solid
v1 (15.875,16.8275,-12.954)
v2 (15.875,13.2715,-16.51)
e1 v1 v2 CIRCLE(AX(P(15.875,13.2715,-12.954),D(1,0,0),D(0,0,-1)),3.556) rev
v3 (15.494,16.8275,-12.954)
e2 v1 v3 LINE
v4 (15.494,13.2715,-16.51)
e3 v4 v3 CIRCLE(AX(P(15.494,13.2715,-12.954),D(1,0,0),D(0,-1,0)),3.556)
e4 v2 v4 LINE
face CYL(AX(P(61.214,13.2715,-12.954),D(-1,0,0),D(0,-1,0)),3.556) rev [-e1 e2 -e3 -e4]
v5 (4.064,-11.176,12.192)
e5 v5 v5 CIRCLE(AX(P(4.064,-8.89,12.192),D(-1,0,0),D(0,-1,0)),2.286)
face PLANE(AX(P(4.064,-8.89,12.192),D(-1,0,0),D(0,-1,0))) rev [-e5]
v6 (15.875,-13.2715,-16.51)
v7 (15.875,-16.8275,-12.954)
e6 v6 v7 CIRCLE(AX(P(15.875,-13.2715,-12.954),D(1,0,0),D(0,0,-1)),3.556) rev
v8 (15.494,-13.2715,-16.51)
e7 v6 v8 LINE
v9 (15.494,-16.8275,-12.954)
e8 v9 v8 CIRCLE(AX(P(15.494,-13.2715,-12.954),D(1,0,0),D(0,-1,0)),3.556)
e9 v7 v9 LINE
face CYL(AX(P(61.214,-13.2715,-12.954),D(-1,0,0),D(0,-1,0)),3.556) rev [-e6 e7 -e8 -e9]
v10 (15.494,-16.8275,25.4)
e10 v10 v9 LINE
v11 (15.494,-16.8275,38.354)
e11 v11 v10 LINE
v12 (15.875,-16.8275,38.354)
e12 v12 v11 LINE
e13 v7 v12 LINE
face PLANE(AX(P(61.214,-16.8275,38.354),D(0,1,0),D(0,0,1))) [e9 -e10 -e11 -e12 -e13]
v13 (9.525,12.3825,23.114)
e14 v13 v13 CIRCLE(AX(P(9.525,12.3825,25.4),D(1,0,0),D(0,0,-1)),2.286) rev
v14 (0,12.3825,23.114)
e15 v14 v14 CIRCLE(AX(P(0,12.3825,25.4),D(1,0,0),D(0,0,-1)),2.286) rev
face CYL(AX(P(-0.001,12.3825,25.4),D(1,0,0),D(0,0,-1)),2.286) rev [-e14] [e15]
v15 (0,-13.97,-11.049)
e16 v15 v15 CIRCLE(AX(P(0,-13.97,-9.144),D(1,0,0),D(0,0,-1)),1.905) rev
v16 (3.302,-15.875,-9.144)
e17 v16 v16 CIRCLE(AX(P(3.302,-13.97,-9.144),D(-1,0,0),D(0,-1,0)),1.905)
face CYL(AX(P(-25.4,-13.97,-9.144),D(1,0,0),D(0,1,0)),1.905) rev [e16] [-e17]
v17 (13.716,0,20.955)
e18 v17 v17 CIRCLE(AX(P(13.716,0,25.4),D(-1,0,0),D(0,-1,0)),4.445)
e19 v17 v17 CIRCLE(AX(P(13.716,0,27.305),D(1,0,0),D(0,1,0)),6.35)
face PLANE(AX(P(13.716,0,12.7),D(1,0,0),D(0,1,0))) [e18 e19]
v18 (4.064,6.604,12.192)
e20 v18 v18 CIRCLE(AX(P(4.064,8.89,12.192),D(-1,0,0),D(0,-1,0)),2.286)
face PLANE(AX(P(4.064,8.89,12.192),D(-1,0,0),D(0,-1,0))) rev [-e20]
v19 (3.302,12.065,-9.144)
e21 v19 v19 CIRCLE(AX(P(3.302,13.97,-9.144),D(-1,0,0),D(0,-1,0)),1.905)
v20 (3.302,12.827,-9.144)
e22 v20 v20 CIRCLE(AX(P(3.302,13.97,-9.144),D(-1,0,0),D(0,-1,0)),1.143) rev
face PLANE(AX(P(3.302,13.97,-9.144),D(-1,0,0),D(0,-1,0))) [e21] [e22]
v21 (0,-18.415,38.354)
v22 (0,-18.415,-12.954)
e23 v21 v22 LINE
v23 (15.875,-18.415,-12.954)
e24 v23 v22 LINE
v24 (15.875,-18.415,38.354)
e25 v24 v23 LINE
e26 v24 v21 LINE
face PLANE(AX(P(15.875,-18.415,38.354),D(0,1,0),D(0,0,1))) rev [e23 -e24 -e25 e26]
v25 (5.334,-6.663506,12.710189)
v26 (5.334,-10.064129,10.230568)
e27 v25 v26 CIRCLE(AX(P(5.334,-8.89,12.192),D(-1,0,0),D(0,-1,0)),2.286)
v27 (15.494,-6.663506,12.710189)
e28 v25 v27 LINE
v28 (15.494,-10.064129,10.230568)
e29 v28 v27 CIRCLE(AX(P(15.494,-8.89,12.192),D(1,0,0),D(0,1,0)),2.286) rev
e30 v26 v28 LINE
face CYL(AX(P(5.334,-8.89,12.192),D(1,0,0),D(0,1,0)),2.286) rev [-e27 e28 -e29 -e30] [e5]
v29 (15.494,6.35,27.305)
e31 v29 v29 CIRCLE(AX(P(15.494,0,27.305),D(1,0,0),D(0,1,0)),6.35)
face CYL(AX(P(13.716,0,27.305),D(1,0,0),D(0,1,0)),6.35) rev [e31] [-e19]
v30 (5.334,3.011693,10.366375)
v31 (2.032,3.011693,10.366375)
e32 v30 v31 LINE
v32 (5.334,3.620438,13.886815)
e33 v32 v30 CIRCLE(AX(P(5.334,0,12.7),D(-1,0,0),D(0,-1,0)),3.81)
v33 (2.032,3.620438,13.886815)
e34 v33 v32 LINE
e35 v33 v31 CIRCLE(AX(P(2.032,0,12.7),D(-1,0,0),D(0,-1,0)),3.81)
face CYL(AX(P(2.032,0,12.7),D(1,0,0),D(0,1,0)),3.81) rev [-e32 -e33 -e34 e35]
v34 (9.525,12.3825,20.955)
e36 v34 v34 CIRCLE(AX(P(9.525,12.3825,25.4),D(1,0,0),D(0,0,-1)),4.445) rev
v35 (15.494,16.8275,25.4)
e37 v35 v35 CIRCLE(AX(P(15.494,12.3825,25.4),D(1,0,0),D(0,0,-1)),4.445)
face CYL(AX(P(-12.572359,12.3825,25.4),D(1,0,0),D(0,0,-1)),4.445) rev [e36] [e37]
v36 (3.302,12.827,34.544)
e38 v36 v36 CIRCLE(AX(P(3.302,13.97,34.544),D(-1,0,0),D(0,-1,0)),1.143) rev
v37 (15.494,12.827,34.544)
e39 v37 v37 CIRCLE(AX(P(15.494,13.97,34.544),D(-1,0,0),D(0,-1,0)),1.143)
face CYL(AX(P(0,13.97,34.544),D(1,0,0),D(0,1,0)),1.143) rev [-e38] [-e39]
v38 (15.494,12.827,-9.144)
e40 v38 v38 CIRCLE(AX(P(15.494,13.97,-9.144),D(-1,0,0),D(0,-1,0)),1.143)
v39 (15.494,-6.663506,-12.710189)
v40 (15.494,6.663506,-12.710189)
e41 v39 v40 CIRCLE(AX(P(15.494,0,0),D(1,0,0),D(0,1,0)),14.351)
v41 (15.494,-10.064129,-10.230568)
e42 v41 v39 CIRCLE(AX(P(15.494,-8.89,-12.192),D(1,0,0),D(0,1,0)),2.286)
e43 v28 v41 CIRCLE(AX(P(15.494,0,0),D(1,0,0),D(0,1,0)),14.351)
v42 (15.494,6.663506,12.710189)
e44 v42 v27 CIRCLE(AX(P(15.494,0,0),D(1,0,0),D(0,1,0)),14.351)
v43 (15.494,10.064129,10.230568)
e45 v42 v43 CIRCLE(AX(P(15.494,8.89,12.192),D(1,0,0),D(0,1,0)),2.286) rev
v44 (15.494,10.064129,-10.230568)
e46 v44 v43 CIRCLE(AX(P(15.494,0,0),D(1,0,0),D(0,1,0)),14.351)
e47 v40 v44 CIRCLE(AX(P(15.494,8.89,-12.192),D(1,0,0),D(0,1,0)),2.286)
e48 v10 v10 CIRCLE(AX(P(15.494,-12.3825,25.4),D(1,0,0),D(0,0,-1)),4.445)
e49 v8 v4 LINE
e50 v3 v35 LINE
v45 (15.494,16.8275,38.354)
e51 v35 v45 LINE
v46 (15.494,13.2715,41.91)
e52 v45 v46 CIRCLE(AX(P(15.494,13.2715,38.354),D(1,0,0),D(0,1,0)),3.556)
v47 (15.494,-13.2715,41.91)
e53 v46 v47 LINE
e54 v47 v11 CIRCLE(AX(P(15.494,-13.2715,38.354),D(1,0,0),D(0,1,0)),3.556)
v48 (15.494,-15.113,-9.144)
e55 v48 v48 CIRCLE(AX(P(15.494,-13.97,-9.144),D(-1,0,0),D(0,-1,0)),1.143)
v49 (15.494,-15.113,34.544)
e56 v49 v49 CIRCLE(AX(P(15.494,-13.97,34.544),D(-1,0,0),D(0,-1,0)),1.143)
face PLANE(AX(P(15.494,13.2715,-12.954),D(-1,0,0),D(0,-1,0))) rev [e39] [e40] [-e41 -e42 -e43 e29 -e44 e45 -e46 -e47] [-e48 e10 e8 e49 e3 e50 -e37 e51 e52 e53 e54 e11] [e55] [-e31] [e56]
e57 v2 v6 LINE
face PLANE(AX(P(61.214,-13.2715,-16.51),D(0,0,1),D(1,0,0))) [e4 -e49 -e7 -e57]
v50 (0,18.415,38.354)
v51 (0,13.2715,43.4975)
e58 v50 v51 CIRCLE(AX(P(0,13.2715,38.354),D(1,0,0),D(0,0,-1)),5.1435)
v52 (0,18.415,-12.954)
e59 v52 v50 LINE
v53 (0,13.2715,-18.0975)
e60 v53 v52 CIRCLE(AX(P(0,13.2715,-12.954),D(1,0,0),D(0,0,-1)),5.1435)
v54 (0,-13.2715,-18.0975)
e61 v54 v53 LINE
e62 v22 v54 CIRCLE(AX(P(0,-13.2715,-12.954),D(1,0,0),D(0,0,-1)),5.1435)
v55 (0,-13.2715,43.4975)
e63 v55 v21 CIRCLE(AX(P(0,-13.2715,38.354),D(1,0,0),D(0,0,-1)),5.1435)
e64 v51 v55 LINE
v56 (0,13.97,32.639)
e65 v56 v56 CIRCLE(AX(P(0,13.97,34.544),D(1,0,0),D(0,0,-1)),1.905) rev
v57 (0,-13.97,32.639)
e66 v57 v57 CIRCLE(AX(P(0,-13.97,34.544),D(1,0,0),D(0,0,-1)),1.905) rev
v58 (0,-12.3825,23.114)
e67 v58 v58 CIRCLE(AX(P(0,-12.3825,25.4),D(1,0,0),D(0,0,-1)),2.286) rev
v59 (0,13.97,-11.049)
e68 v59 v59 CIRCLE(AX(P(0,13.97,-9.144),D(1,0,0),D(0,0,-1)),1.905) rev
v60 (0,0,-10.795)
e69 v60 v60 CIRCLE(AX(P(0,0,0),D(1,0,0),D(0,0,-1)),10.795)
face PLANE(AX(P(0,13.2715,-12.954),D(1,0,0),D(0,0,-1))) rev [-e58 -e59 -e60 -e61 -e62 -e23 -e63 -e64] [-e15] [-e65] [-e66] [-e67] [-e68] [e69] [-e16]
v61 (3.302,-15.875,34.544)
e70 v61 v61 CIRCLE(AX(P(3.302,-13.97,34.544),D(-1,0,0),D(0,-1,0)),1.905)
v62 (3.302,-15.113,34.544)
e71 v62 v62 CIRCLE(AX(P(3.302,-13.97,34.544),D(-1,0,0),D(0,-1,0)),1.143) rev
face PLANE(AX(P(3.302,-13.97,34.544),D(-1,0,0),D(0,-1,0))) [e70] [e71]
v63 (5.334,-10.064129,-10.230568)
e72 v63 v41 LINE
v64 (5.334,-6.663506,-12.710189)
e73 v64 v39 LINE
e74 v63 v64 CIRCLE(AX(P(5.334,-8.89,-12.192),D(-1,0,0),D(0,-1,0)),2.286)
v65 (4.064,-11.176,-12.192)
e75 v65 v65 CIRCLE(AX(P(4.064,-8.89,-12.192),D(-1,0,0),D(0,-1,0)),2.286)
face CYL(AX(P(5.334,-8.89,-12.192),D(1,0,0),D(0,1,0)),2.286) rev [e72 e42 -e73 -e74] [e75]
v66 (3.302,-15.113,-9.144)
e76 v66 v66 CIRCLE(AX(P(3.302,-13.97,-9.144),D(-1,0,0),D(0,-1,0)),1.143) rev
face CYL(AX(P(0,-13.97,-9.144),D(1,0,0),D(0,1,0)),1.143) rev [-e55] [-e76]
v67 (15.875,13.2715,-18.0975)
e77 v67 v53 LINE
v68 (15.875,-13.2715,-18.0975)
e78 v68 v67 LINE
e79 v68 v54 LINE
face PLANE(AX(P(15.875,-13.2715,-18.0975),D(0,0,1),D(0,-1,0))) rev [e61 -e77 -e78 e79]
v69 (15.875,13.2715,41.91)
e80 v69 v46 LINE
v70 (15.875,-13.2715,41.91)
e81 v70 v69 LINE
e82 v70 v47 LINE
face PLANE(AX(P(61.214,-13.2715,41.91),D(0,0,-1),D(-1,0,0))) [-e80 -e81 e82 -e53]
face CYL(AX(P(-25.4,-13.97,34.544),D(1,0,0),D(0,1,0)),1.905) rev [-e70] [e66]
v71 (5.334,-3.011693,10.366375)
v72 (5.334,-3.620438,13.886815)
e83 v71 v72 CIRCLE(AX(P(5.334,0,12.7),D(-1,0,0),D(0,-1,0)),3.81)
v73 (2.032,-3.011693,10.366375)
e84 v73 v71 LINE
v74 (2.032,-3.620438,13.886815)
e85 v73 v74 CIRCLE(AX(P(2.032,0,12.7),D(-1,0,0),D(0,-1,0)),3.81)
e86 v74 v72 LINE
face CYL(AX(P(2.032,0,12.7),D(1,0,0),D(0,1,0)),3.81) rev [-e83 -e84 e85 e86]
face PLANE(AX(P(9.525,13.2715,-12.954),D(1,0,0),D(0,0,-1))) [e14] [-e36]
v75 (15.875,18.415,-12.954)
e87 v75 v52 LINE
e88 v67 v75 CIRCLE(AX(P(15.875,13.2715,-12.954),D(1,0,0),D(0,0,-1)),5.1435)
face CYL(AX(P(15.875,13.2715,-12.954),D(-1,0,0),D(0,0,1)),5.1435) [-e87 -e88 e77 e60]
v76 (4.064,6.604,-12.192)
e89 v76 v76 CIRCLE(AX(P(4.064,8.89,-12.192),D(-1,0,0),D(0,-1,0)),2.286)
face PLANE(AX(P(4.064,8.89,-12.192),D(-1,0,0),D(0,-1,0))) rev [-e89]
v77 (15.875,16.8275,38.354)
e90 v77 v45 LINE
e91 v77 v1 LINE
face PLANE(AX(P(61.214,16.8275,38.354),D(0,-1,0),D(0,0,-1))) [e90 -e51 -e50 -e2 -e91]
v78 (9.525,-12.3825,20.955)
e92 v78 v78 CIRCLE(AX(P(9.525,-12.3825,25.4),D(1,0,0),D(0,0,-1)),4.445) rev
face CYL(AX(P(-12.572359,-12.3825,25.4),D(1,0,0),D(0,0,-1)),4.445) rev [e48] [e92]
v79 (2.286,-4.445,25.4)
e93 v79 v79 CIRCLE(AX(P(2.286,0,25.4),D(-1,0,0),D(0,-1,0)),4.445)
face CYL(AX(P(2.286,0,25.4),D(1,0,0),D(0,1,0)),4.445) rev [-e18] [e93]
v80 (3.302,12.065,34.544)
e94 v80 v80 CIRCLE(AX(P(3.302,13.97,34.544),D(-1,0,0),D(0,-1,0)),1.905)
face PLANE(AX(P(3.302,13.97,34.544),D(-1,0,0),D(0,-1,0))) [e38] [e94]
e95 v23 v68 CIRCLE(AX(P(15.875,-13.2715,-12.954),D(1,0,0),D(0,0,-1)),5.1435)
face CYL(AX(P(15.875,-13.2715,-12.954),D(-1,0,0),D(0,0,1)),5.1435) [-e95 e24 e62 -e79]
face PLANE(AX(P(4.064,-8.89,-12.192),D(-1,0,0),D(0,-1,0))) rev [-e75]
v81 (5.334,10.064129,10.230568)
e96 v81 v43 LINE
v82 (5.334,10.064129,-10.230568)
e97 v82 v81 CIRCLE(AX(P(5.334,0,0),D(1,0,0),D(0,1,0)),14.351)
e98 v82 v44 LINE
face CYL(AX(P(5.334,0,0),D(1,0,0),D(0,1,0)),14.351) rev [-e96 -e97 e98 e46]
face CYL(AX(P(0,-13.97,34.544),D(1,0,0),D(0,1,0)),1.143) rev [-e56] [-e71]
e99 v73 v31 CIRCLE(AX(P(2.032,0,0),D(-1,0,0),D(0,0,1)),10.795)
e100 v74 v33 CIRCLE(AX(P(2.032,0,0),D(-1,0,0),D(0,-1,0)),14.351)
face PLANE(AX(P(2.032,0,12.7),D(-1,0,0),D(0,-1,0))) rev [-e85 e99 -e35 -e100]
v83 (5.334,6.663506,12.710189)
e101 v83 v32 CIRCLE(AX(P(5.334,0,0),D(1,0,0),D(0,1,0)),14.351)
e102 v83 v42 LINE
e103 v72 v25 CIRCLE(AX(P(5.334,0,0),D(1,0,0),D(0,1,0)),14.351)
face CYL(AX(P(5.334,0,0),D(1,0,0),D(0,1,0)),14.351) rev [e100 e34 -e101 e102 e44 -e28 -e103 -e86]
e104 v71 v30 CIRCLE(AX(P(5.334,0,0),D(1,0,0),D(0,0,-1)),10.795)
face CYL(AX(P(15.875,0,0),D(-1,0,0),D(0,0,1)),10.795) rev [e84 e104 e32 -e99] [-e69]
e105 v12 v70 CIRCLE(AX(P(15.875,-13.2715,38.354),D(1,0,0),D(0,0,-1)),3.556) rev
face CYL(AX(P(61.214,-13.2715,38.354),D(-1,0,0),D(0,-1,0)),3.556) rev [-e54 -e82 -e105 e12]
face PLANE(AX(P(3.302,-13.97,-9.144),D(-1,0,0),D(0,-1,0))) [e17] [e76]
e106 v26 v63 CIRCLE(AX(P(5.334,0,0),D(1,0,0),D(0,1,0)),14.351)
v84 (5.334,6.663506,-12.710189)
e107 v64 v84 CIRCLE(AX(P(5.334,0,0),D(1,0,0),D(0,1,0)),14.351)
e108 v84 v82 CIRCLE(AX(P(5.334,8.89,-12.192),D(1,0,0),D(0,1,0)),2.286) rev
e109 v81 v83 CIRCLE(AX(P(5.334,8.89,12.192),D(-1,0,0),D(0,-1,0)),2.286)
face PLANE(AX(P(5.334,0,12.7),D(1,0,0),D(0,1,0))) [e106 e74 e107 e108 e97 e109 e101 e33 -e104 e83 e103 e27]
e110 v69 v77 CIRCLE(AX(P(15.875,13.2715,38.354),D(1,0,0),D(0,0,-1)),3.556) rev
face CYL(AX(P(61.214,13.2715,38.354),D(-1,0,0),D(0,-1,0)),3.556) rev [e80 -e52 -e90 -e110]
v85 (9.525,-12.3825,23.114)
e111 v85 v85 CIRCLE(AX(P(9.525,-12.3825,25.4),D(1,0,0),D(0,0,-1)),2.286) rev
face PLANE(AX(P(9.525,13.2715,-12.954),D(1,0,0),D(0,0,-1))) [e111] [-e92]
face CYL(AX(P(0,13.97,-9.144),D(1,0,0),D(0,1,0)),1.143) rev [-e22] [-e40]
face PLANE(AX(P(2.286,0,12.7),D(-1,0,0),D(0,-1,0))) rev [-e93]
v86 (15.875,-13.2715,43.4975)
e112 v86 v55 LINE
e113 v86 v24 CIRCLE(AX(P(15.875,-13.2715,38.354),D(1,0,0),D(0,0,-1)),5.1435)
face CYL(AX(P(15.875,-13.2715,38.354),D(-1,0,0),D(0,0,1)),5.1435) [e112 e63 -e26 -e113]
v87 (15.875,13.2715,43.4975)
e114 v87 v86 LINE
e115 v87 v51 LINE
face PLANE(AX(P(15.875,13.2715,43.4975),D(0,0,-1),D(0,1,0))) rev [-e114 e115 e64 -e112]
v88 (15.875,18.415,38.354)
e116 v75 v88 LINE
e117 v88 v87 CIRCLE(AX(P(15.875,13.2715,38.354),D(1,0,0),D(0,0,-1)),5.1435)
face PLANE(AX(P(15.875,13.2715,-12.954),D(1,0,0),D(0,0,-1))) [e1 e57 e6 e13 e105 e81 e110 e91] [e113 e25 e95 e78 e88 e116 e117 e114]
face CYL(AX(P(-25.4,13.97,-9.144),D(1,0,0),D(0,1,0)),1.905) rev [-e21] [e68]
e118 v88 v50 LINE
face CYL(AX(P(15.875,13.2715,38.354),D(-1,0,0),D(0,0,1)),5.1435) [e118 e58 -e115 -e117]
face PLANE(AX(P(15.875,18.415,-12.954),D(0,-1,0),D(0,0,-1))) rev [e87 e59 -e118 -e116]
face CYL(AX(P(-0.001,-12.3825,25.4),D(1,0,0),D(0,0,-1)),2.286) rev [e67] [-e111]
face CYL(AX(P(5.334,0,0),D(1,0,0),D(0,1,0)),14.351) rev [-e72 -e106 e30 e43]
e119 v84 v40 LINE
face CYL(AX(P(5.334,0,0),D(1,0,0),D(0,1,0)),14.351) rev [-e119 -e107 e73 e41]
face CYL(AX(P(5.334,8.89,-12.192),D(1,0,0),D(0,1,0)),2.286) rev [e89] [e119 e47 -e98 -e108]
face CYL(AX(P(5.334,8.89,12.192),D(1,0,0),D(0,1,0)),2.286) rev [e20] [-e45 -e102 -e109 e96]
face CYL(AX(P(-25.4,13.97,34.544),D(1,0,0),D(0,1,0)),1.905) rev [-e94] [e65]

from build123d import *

# Parameters (mm, degrees)
SKETCH1_R             = 10.795
BOSS_EXTRUDE1_DEPTH   = 15.875
CAVITY1_START         = 5.334
CAVITY1_OUTLINE_R     = 1.143
CAVITY1_OUTLINE_R_2   = 4.445
CAVITY1_OUTLINE_R_3   = 10.795
CAVITY1_DEPTH         = 10.541
CAVITY1_START_2       = 15.494
CAVITY1_2_OUTLINE_R   = 1.143
CAVITY1_2_OUTLINE_R_2 = 4.445
CAVITY1_2_DEPTH       = 0.381
CAVITY1_START_3       = 2.286
CAVITY1_3_OUTLINE_R   = 1.143
CAVITY1_3_OUTLINE_R_2 = 4.445
CAVITY1_3_DEPTH       = 3.048
CAVITY1_4_OUTLINE_R   = 1.905
CAVITY1_4_DEPTH       = 3.302
CAVITY1_START_4       = 13.716
CAVITY1_5_DEPTH       = 1.778
CAVITY1_START_5       = 4.064
CAVITY1_6_OUTLINE_R   = 2.286
CAVITY1_6_DEPTH       = 1.27
CAVITY1_START_6       = 2.032
CAVITY1_7_DEPTH       = 0.254
CUT_EXTRUDE1_REACH    = 51.711
SKETCH2_R             = 2.286
SKETCH3_R             = 4.445
CUT_EXTRUDE2_DEPTH    = 5.969


# Read off the part's stored shape, not the designer's step: Cavity1
with BuildPart() as part:
    # Sketch1 → Boss-Extrude1 (new body)
    with BuildSketch(Plane(origin=(0, 0, 0), x_dir=(0, 0, -1), z_dir=(1, 0, 0))):
        with BuildLine():
            Line((12.954, 18.415), (-38.354, 18.415))
            ThreePointArc((-38.354, 18.415), (-41.991003729, 16.908503729), (-43.4975, 13.2715))
            Line((-43.4975, 13.2715), (-43.4975, -13.2715))
            ThreePointArc((-43.4975, -13.2715), (-41.991003729, -16.908503729), (-38.354, -18.415))
            Line((-38.354, -18.415), (12.954, -18.415))
            ThreePointArc((12.954, -18.415), (16.591003729, -16.908503729), (18.0975, -13.2715))
            Line((18.0975, -13.2715), (18.0975, 13.2715))
            ThreePointArc((18.0975, 13.2715), (16.591003729, 16.908503729), (12.954, 18.415))
        make_face()
        Circle(SKETCH1_R, mode=Mode.SUBTRACT)
    extrude(amount=BOSS_EXTRUDE1_DEPTH)

    # Cavity1 outline → Cavity1 (cut)
    # profile 1 of 6: a face of its own
    with BuildSketch(Plane.YZ.offset(CAVITY1_START)):
        with Locations((13.97, 34.544)):
            Circle(CAVITY1_OUTLINE_R)
    # profile 2 of 6: a face of its own
    with BuildSketch(Plane.YZ.offset(CAVITY1_START)):
        with Locations((0, 25.4)):
            Circle(CAVITY1_OUTLINE_R_2)
    # profile 3 of 6: a face of its own
    with BuildSketch(Plane.YZ.offset(CAVITY1_START)):
        with BuildLine():
            ThreePointArc((6.663505747, 12.710188518), (0, 14.351), (-6.663505747, 12.710188518))
            ThreePointArc((-6.663505747, 12.710188518), (-10.236847552, 14.039105214), (-10.064128852, 10.230567504))
            ThreePointArc((-10.064128852, 10.230567504), (-14.351, 0), (-10.064128852, -10.230567504))
            ThreePointArc((-10.064128852, -10.230567504), (-10.236847552, -14.039105214), (-6.663505747, -12.710188518))
            ThreePointArc((-6.663505747, -12.710188518), (0, -14.351), (6.663505747, -12.710188518))
            ThreePointArc((6.663505747, -12.710188518), (10.236847552, -14.039105214), (10.064128852, -10.230567504))
            ThreePointArc((10.064128852, -10.230567504), (14.351, 0), (10.064128852, 10.230567504))
            ThreePointArc((10.064128852, 10.230567504), (10.236847552, 14.039105214), (6.663505747, 12.710188518))
        make_face()
        Circle(CAVITY1_OUTLINE_R_3, mode=Mode.SUBTRACT)
    # profile 4 of 6: a face of its own
    with BuildSketch(Plane.YZ.offset(CAVITY1_START)):
        with Locations((13.97, -9.144)):
            Circle(CAVITY1_OUTLINE_R)
    # profile 5 of 6: a face of its own
    with BuildSketch(Plane.YZ.offset(CAVITY1_START)):
        with Locations((-13.97, 34.544)):
            Circle(CAVITY1_OUTLINE_R)
    # profile 6 of 6: a face of its own
    with BuildSketch(Plane.YZ.offset(CAVITY1_START)):
        with Locations((-13.97, -9.144)):
            Circle(CAVITY1_OUTLINE_R)
    extrude(amount=CAVITY1_DEPTH, mode=Mode.SUBTRACT)

    # Cavity1 2 outline → Cavity1 2 (cut)
    with BuildSketch(Plane.YZ.offset(CAVITY1_START_2)):
        with BuildLine():
            ThreePointArc((16.8275, 38.354), (15.785971714, 40.868471714), (13.2715, 41.91))
            Line((13.2715, 41.91), (-13.2715, 41.91))
            ThreePointArc((-13.2715, 41.91), (-15.785971714, 40.868471714), (-16.8275, 38.354))
            Line((-16.8275, 38.354), (-16.8275, -12.954))
            ThreePointArc((-16.8275, -12.954), (-15.785971714, -15.468471714), (-13.2715, -16.51))
            Line((-13.2715, -16.51), (13.2715, -16.51))
            ThreePointArc((13.2715, -16.51), (15.785971714, -15.468471714), (16.8275, -12.954))
            Line((16.8275, -12.954), (16.8275, 38.354))
        make_face()
        with Locations((13.97, 34.544)):
            Circle(CAVITY1_2_OUTLINE_R, mode=Mode.SUBTRACT)
        with BuildLine():
            ThreePointArc((10.064128852, 10.230567504), (14.351, 0), (10.064128852, -10.230567504))
            ThreePointArc((10.064128852, -10.230567504), (10.236847552, -14.039105214), (6.663505747, -12.710188518))
            ThreePointArc((6.663505747, -12.710188518), (0, -14.351), (-6.663505747, -12.710188518))
            ThreePointArc((-6.663505747, -12.710188518), (-10.236847552, -14.039105214), (-10.064128852, -10.230567504))
            ThreePointArc((-10.064128852, -10.230567504), (-14.351, 0), (-10.064128852, 10.230567504))
            ThreePointArc((-10.064128852, 10.230567504), (-10.236847552, 14.039105214), (-6.663505747, 12.710188518))
            ThreePointArc((-6.663505747, 12.710188518), (0, 14.351), (6.663505747, 12.710188518))
            ThreePointArc((6.663505747, 12.710188518), (10.236847552, 14.039105214), (10.064128852, 10.230567504))
        make_face(mode=Mode.SUBTRACT)
        with Locations((0, 25.4)):
            Circle(CAVITY1_2_OUTLINE_R_2, mode=Mode.SUBTRACT)
        with Locations((13.97, -9.144)):
            Circle(CAVITY1_2_OUTLINE_R, mode=Mode.SUBTRACT)
        with Locations((-13.97, 34.544)):
            Circle(CAVITY1_2_OUTLINE_R, mode=Mode.SUBTRACT)
        with Locations((-13.97, -9.144)):
            Circle(CAVITY1_2_OUTLINE_R, mode=Mode.SUBTRACT)
    extrude(amount=CAVITY1_2_DEPTH, mode=Mode.SUBTRACT)

    # Cavity1 3 outline → Cavity1 3 (cut)
    with BuildSketch(Plane.YZ.offset(CAVITY1_START_3)):
        with Locations((13.97, 34.544)):
            Circle(CAVITY1_3_OUTLINE_R)
        with Locations((0, 25.4)):
            Circle(CAVITY1_3_OUTLINE_R_2)
        with BuildLine():
            ThreePointArc((3.011692939, 10.366375), (3.7542861, 12.050819068), (3.62043784, 13.886815))
            ThreePointArc((3.62043784, 13.886815), (0, 14.351), (-3.62043784, 13.886815))
            ThreePointArc((-3.62043784, 13.886815), (-3.7542861, 12.050819068), (-3.011692939, 10.366375))
            ThreePointArc((-3.011692939, 10.366375), (0, 10.795), (3.011692939, 10.366375))
        make_face()
        with Locations((13.97, -9.144)):
            Circle(CAVITY1_3_OUTLINE_R)
        with Locations((-13.97, 34.544)):
            Circle(CAVITY1_3_OUTLINE_R)
        with Locations((-13.97, -9.144)):
            Circle(CAVITY1_3_OUTLINE_R)
    extrude(amount=CAVITY1_3_DEPTH, mode=Mode.SUBTRACT)

    # Cavity1 4 outline → Cavity1 4 (cut)
    with BuildSketch(Plane.YZ):
        with Locations((13.97, 34.544)):
            Circle(CAVITY1_4_OUTLINE_R)
        with Locations((13.97, -9.144)):
            Circle(CAVITY1_4_OUTLINE_R)
        with Locations((-13.97, 34.544)):
            Circle(CAVITY1_4_OUTLINE_R)
        with Locations((-13.97, -9.144)):
            Circle(CAVITY1_4_OUTLINE_R)
    extrude(amount=CAVITY1_4_DEPTH, mode=Mode.SUBTRACT)

    # Cavity1 5 outline → Cavity1 5 (cut)
    with BuildSketch(Plane.YZ.offset(CAVITY1_START_4)):
        with BuildLine():
            Line((4.32851275, 24.389058668), (6.269761763, 26.298725967))
            ThreePointArc((6.269761763, 26.298725967), (6.329908656, 26.800266009), (6.35, 27.305))
            ThreePointArc((6.35, 27.305), (5.350674614, 30.724470892), (2.667234274, 33.067669635))
            Line((2.667234274, 33.067669635), (1.522653349, 29.576068938))
            ThreePointArc((1.522653349, 29.576068938), (3.641855237, 27.948512396), (4.445, 25.4))
            ThreePointArc((4.445, 25.4), (4.41578216, 24.891184794), (4.32851275, 24.389058668))
        make_face()
        with BuildLine():
            ThreePointArc((1.261900966, 21.081648335), (4.581043617, 22.907666788), (6.269761763, 26.298725967))
            Line((6.269761763, 26.298725967), (4.32851275, 24.389058668))
            ThreePointArc((4.32851275, 24.389058668), (3.227510813, 22.343662494), (1.245086431, 21.132941906))
            Line((1.245086431, 21.132941906), (1.261900966, 21.081648335))
        make_face()
        with BuildLine():
            ThreePointArc((0.903307826, 21.019577582), (1.083049155, 21.048043509), (1.261900966, 21.081648335))
            Line((1.261900966, 21.081648335), (1.245086431, 21.132941906))
            ThreePointArc((1.245086431, 21.132941906), (1.093135949, 21.091510845), (0.939813075, 21.055488936))
            Line((0.939813075, 21.055488936), (0.903307826, 21.019577582))
        make_face()
        with BuildLine():
            ThreePointArc((3.3e-08, 20.955), (0.452806623, 20.971164972), (0.903307826, 21.019577582))
            Line((0.903307826, 21.019577582), (0.939813075, 21.055488936))
            ThreePointArc((0.939813075, 21.055488936), (0.472585099, 20.980193633), (3.3e-08, 20.955))
        make_face()
        with BuildLine():
            Line((1.522653349, 29.576068938), (2.667234274, 33.067669635))
            ThreePointArc((2.667234274, 33.067669635), (0, 33.655), (-2.667234274, 33.067669635))
            Line((-2.667234274, 33.067669635), (-1.522653349, 29.576068938))
            ThreePointArc((-1.522653349, 29.576068938), (0, 29.845), (1.522653349, 29.576068938))
        make_face()
        with BuildLine():
            ThreePointArc((-0.903307826, 21.019577582), (-0.45280659, 20.97116497), (3.3e-08, 20.955))
            ThreePointArc((3.3e-08, 20.955), (-0.472585066, 20.980193629), (-0.939813075, 21.055488936))
            Line((-0.939813075, 21.055488936), (-0.903307826, 21.019577582))
        make_face()
        with BuildLine():
            Line((-1.522653349, 29.576068938), (-2.667234274, 33.067669635))
            ThreePointArc((-2.667234274, 33.067669635), (-5.605544054, 30.288349771), (-6.269761763, 26.298725967))
            Line((-6.269761763, 26.298725967), (-4.32851275, 24.389058668))
            ThreePointArc((-4.32851275, 24.389058668), (-3.909642575, 27.514880596), (-1.522653349, 29.576068938))
        make_face()
        with BuildLine():
            ThreePointArc((-1.261900966, 21.081648335), (-1.083049155, 21.048043509), (-0.903307826, 21.019577582))
            Line((-0.903307826, 21.019577582), (-0.939813075, 21.055488936))
            ThreePointArc((-0.939813075, 21.055488936), (-1.093135949, 21.091510845), (-1.245086431, 21.132941906))
            Line((-1.245086431, 21.132941906), (-1.261900966, 21.081648335))
        make_face()
        with BuildLine():
            Line((-4.32851275, 24.389058668), (-6.269761763, 26.298725967))
            ThreePointArc((-6.269761763, 26.298725967), (-4.581043617, 22.907666788), (-1.261900966, 21.081648335))
            Line((-1.261900966, 21.081648335), (-1.245086431, 21.132941906))
            ThreePointArc((-1.245086431, 21.132941906), (-3.227510813, 22.343662494), (-4.32851275, 24.389058668))
        make_face()
    extrude(amount=CAVITY1_5_DEPTH, mode=Mode.SUBTRACT)

    # Cavity1 6 outline → Cavity1 6 (cut)
    with BuildSketch(Plane.YZ.offset(CAVITY1_START_5)):
        with Locations((8.89, 12.192)):
            Circle(CAVITY1_6_OUTLINE_R)
        with Locations((8.89, -12.192)):
            Circle(CAVITY1_6_OUTLINE_R)
        with Locations((-8.89, 12.192)):
            Circle(CAVITY1_6_OUTLINE_R)
        with Locations((-8.89, -12.192)):
            Circle(CAVITY1_6_OUTLINE_R)
    extrude(amount=CAVITY1_6_DEPTH, mode=Mode.SUBTRACT)

    # Cavity1 7 outline → Cavity1 7 (cut)
    with BuildSketch(Plane.YZ.offset(CAVITY1_START_6)):
        with BuildLine():
            ThreePointArc((3.011692939, 10.366375), (3.7542861, 12.050819068), (3.62043784, 13.886815))
            ThreePointArc((3.62043784, 13.886815), (0, 14.351), (-3.62043784, 13.886815))
            ThreePointArc((-3.62043784, 13.886815), (-3.7542861, 12.050819068), (-3.011692939, 10.366375))
            ThreePointArc((-3.011692939, 10.366375), (0, 10.795), (3.011692939, 10.366375))
        make_face()
    extrude(amount=CAVITY1_7_DEPTH, mode=Mode.SUBTRACT)

    # Sketch2 → Cut-Extrude1 (cut, up to next)
    with BuildSketch(Plane(origin=(15.494, 0, 0), x_dir=(0, 0, -1), z_dir=(1, 0, 0)), mode=Mode.PRIVATE) as cut_extrude1_sk1:
        with Locations((-25.4, 12.3825)):
            Circle(SKETCH2_R)
    cut_extrude1_tool1 = extrude(cut_extrude1_sk1.sketch, amount=-CUT_EXTRUDE1_REACH, mode=Mode.PRIVATE) & part.part
    # Sketch2 → Cut-Extrude1 (cut, up to next)
    with BuildSketch(Plane(origin=(15.494, 0, 0), x_dir=(0, 0, -1), z_dir=(1, 0, 0)), mode=Mode.PRIVATE) as cut_extrude1_sk2:
        with Locations((-25.4, -12.3825)):
            Circle(SKETCH2_R)
    cut_extrude1_tool2 = extrude(cut_extrude1_sk2.sketch, amount=-CUT_EXTRUDE1_REACH, mode=Mode.PRIVATE) & part.part
    add(cut_extrude1_tool1.solids().sort_by_distance((15.494, 12.3825, 25.4))[0], mode=Mode.SUBTRACT)
    add(cut_extrude1_tool2.solids().sort_by_distance((15.494, -12.3825, 25.4))[0], mode=Mode.SUBTRACT)

    # Sketch3 → Cut-Extrude2 (cut)
    with BuildSketch(Plane(origin=(15.494, 0, 0), x_dir=(0, 0, -1), z_dir=(1, 0, 0))):
        with Locations((-25.4, 12.3825)):
            Circle(SKETCH3_R)
        with Locations((-25.4, -12.3825)):
            Circle(SKETCH3_R)
    extrude(amount=-CUT_EXTRUDE2_DEPTH, mode=Mode.SUBTRACT)


solid = part.part
